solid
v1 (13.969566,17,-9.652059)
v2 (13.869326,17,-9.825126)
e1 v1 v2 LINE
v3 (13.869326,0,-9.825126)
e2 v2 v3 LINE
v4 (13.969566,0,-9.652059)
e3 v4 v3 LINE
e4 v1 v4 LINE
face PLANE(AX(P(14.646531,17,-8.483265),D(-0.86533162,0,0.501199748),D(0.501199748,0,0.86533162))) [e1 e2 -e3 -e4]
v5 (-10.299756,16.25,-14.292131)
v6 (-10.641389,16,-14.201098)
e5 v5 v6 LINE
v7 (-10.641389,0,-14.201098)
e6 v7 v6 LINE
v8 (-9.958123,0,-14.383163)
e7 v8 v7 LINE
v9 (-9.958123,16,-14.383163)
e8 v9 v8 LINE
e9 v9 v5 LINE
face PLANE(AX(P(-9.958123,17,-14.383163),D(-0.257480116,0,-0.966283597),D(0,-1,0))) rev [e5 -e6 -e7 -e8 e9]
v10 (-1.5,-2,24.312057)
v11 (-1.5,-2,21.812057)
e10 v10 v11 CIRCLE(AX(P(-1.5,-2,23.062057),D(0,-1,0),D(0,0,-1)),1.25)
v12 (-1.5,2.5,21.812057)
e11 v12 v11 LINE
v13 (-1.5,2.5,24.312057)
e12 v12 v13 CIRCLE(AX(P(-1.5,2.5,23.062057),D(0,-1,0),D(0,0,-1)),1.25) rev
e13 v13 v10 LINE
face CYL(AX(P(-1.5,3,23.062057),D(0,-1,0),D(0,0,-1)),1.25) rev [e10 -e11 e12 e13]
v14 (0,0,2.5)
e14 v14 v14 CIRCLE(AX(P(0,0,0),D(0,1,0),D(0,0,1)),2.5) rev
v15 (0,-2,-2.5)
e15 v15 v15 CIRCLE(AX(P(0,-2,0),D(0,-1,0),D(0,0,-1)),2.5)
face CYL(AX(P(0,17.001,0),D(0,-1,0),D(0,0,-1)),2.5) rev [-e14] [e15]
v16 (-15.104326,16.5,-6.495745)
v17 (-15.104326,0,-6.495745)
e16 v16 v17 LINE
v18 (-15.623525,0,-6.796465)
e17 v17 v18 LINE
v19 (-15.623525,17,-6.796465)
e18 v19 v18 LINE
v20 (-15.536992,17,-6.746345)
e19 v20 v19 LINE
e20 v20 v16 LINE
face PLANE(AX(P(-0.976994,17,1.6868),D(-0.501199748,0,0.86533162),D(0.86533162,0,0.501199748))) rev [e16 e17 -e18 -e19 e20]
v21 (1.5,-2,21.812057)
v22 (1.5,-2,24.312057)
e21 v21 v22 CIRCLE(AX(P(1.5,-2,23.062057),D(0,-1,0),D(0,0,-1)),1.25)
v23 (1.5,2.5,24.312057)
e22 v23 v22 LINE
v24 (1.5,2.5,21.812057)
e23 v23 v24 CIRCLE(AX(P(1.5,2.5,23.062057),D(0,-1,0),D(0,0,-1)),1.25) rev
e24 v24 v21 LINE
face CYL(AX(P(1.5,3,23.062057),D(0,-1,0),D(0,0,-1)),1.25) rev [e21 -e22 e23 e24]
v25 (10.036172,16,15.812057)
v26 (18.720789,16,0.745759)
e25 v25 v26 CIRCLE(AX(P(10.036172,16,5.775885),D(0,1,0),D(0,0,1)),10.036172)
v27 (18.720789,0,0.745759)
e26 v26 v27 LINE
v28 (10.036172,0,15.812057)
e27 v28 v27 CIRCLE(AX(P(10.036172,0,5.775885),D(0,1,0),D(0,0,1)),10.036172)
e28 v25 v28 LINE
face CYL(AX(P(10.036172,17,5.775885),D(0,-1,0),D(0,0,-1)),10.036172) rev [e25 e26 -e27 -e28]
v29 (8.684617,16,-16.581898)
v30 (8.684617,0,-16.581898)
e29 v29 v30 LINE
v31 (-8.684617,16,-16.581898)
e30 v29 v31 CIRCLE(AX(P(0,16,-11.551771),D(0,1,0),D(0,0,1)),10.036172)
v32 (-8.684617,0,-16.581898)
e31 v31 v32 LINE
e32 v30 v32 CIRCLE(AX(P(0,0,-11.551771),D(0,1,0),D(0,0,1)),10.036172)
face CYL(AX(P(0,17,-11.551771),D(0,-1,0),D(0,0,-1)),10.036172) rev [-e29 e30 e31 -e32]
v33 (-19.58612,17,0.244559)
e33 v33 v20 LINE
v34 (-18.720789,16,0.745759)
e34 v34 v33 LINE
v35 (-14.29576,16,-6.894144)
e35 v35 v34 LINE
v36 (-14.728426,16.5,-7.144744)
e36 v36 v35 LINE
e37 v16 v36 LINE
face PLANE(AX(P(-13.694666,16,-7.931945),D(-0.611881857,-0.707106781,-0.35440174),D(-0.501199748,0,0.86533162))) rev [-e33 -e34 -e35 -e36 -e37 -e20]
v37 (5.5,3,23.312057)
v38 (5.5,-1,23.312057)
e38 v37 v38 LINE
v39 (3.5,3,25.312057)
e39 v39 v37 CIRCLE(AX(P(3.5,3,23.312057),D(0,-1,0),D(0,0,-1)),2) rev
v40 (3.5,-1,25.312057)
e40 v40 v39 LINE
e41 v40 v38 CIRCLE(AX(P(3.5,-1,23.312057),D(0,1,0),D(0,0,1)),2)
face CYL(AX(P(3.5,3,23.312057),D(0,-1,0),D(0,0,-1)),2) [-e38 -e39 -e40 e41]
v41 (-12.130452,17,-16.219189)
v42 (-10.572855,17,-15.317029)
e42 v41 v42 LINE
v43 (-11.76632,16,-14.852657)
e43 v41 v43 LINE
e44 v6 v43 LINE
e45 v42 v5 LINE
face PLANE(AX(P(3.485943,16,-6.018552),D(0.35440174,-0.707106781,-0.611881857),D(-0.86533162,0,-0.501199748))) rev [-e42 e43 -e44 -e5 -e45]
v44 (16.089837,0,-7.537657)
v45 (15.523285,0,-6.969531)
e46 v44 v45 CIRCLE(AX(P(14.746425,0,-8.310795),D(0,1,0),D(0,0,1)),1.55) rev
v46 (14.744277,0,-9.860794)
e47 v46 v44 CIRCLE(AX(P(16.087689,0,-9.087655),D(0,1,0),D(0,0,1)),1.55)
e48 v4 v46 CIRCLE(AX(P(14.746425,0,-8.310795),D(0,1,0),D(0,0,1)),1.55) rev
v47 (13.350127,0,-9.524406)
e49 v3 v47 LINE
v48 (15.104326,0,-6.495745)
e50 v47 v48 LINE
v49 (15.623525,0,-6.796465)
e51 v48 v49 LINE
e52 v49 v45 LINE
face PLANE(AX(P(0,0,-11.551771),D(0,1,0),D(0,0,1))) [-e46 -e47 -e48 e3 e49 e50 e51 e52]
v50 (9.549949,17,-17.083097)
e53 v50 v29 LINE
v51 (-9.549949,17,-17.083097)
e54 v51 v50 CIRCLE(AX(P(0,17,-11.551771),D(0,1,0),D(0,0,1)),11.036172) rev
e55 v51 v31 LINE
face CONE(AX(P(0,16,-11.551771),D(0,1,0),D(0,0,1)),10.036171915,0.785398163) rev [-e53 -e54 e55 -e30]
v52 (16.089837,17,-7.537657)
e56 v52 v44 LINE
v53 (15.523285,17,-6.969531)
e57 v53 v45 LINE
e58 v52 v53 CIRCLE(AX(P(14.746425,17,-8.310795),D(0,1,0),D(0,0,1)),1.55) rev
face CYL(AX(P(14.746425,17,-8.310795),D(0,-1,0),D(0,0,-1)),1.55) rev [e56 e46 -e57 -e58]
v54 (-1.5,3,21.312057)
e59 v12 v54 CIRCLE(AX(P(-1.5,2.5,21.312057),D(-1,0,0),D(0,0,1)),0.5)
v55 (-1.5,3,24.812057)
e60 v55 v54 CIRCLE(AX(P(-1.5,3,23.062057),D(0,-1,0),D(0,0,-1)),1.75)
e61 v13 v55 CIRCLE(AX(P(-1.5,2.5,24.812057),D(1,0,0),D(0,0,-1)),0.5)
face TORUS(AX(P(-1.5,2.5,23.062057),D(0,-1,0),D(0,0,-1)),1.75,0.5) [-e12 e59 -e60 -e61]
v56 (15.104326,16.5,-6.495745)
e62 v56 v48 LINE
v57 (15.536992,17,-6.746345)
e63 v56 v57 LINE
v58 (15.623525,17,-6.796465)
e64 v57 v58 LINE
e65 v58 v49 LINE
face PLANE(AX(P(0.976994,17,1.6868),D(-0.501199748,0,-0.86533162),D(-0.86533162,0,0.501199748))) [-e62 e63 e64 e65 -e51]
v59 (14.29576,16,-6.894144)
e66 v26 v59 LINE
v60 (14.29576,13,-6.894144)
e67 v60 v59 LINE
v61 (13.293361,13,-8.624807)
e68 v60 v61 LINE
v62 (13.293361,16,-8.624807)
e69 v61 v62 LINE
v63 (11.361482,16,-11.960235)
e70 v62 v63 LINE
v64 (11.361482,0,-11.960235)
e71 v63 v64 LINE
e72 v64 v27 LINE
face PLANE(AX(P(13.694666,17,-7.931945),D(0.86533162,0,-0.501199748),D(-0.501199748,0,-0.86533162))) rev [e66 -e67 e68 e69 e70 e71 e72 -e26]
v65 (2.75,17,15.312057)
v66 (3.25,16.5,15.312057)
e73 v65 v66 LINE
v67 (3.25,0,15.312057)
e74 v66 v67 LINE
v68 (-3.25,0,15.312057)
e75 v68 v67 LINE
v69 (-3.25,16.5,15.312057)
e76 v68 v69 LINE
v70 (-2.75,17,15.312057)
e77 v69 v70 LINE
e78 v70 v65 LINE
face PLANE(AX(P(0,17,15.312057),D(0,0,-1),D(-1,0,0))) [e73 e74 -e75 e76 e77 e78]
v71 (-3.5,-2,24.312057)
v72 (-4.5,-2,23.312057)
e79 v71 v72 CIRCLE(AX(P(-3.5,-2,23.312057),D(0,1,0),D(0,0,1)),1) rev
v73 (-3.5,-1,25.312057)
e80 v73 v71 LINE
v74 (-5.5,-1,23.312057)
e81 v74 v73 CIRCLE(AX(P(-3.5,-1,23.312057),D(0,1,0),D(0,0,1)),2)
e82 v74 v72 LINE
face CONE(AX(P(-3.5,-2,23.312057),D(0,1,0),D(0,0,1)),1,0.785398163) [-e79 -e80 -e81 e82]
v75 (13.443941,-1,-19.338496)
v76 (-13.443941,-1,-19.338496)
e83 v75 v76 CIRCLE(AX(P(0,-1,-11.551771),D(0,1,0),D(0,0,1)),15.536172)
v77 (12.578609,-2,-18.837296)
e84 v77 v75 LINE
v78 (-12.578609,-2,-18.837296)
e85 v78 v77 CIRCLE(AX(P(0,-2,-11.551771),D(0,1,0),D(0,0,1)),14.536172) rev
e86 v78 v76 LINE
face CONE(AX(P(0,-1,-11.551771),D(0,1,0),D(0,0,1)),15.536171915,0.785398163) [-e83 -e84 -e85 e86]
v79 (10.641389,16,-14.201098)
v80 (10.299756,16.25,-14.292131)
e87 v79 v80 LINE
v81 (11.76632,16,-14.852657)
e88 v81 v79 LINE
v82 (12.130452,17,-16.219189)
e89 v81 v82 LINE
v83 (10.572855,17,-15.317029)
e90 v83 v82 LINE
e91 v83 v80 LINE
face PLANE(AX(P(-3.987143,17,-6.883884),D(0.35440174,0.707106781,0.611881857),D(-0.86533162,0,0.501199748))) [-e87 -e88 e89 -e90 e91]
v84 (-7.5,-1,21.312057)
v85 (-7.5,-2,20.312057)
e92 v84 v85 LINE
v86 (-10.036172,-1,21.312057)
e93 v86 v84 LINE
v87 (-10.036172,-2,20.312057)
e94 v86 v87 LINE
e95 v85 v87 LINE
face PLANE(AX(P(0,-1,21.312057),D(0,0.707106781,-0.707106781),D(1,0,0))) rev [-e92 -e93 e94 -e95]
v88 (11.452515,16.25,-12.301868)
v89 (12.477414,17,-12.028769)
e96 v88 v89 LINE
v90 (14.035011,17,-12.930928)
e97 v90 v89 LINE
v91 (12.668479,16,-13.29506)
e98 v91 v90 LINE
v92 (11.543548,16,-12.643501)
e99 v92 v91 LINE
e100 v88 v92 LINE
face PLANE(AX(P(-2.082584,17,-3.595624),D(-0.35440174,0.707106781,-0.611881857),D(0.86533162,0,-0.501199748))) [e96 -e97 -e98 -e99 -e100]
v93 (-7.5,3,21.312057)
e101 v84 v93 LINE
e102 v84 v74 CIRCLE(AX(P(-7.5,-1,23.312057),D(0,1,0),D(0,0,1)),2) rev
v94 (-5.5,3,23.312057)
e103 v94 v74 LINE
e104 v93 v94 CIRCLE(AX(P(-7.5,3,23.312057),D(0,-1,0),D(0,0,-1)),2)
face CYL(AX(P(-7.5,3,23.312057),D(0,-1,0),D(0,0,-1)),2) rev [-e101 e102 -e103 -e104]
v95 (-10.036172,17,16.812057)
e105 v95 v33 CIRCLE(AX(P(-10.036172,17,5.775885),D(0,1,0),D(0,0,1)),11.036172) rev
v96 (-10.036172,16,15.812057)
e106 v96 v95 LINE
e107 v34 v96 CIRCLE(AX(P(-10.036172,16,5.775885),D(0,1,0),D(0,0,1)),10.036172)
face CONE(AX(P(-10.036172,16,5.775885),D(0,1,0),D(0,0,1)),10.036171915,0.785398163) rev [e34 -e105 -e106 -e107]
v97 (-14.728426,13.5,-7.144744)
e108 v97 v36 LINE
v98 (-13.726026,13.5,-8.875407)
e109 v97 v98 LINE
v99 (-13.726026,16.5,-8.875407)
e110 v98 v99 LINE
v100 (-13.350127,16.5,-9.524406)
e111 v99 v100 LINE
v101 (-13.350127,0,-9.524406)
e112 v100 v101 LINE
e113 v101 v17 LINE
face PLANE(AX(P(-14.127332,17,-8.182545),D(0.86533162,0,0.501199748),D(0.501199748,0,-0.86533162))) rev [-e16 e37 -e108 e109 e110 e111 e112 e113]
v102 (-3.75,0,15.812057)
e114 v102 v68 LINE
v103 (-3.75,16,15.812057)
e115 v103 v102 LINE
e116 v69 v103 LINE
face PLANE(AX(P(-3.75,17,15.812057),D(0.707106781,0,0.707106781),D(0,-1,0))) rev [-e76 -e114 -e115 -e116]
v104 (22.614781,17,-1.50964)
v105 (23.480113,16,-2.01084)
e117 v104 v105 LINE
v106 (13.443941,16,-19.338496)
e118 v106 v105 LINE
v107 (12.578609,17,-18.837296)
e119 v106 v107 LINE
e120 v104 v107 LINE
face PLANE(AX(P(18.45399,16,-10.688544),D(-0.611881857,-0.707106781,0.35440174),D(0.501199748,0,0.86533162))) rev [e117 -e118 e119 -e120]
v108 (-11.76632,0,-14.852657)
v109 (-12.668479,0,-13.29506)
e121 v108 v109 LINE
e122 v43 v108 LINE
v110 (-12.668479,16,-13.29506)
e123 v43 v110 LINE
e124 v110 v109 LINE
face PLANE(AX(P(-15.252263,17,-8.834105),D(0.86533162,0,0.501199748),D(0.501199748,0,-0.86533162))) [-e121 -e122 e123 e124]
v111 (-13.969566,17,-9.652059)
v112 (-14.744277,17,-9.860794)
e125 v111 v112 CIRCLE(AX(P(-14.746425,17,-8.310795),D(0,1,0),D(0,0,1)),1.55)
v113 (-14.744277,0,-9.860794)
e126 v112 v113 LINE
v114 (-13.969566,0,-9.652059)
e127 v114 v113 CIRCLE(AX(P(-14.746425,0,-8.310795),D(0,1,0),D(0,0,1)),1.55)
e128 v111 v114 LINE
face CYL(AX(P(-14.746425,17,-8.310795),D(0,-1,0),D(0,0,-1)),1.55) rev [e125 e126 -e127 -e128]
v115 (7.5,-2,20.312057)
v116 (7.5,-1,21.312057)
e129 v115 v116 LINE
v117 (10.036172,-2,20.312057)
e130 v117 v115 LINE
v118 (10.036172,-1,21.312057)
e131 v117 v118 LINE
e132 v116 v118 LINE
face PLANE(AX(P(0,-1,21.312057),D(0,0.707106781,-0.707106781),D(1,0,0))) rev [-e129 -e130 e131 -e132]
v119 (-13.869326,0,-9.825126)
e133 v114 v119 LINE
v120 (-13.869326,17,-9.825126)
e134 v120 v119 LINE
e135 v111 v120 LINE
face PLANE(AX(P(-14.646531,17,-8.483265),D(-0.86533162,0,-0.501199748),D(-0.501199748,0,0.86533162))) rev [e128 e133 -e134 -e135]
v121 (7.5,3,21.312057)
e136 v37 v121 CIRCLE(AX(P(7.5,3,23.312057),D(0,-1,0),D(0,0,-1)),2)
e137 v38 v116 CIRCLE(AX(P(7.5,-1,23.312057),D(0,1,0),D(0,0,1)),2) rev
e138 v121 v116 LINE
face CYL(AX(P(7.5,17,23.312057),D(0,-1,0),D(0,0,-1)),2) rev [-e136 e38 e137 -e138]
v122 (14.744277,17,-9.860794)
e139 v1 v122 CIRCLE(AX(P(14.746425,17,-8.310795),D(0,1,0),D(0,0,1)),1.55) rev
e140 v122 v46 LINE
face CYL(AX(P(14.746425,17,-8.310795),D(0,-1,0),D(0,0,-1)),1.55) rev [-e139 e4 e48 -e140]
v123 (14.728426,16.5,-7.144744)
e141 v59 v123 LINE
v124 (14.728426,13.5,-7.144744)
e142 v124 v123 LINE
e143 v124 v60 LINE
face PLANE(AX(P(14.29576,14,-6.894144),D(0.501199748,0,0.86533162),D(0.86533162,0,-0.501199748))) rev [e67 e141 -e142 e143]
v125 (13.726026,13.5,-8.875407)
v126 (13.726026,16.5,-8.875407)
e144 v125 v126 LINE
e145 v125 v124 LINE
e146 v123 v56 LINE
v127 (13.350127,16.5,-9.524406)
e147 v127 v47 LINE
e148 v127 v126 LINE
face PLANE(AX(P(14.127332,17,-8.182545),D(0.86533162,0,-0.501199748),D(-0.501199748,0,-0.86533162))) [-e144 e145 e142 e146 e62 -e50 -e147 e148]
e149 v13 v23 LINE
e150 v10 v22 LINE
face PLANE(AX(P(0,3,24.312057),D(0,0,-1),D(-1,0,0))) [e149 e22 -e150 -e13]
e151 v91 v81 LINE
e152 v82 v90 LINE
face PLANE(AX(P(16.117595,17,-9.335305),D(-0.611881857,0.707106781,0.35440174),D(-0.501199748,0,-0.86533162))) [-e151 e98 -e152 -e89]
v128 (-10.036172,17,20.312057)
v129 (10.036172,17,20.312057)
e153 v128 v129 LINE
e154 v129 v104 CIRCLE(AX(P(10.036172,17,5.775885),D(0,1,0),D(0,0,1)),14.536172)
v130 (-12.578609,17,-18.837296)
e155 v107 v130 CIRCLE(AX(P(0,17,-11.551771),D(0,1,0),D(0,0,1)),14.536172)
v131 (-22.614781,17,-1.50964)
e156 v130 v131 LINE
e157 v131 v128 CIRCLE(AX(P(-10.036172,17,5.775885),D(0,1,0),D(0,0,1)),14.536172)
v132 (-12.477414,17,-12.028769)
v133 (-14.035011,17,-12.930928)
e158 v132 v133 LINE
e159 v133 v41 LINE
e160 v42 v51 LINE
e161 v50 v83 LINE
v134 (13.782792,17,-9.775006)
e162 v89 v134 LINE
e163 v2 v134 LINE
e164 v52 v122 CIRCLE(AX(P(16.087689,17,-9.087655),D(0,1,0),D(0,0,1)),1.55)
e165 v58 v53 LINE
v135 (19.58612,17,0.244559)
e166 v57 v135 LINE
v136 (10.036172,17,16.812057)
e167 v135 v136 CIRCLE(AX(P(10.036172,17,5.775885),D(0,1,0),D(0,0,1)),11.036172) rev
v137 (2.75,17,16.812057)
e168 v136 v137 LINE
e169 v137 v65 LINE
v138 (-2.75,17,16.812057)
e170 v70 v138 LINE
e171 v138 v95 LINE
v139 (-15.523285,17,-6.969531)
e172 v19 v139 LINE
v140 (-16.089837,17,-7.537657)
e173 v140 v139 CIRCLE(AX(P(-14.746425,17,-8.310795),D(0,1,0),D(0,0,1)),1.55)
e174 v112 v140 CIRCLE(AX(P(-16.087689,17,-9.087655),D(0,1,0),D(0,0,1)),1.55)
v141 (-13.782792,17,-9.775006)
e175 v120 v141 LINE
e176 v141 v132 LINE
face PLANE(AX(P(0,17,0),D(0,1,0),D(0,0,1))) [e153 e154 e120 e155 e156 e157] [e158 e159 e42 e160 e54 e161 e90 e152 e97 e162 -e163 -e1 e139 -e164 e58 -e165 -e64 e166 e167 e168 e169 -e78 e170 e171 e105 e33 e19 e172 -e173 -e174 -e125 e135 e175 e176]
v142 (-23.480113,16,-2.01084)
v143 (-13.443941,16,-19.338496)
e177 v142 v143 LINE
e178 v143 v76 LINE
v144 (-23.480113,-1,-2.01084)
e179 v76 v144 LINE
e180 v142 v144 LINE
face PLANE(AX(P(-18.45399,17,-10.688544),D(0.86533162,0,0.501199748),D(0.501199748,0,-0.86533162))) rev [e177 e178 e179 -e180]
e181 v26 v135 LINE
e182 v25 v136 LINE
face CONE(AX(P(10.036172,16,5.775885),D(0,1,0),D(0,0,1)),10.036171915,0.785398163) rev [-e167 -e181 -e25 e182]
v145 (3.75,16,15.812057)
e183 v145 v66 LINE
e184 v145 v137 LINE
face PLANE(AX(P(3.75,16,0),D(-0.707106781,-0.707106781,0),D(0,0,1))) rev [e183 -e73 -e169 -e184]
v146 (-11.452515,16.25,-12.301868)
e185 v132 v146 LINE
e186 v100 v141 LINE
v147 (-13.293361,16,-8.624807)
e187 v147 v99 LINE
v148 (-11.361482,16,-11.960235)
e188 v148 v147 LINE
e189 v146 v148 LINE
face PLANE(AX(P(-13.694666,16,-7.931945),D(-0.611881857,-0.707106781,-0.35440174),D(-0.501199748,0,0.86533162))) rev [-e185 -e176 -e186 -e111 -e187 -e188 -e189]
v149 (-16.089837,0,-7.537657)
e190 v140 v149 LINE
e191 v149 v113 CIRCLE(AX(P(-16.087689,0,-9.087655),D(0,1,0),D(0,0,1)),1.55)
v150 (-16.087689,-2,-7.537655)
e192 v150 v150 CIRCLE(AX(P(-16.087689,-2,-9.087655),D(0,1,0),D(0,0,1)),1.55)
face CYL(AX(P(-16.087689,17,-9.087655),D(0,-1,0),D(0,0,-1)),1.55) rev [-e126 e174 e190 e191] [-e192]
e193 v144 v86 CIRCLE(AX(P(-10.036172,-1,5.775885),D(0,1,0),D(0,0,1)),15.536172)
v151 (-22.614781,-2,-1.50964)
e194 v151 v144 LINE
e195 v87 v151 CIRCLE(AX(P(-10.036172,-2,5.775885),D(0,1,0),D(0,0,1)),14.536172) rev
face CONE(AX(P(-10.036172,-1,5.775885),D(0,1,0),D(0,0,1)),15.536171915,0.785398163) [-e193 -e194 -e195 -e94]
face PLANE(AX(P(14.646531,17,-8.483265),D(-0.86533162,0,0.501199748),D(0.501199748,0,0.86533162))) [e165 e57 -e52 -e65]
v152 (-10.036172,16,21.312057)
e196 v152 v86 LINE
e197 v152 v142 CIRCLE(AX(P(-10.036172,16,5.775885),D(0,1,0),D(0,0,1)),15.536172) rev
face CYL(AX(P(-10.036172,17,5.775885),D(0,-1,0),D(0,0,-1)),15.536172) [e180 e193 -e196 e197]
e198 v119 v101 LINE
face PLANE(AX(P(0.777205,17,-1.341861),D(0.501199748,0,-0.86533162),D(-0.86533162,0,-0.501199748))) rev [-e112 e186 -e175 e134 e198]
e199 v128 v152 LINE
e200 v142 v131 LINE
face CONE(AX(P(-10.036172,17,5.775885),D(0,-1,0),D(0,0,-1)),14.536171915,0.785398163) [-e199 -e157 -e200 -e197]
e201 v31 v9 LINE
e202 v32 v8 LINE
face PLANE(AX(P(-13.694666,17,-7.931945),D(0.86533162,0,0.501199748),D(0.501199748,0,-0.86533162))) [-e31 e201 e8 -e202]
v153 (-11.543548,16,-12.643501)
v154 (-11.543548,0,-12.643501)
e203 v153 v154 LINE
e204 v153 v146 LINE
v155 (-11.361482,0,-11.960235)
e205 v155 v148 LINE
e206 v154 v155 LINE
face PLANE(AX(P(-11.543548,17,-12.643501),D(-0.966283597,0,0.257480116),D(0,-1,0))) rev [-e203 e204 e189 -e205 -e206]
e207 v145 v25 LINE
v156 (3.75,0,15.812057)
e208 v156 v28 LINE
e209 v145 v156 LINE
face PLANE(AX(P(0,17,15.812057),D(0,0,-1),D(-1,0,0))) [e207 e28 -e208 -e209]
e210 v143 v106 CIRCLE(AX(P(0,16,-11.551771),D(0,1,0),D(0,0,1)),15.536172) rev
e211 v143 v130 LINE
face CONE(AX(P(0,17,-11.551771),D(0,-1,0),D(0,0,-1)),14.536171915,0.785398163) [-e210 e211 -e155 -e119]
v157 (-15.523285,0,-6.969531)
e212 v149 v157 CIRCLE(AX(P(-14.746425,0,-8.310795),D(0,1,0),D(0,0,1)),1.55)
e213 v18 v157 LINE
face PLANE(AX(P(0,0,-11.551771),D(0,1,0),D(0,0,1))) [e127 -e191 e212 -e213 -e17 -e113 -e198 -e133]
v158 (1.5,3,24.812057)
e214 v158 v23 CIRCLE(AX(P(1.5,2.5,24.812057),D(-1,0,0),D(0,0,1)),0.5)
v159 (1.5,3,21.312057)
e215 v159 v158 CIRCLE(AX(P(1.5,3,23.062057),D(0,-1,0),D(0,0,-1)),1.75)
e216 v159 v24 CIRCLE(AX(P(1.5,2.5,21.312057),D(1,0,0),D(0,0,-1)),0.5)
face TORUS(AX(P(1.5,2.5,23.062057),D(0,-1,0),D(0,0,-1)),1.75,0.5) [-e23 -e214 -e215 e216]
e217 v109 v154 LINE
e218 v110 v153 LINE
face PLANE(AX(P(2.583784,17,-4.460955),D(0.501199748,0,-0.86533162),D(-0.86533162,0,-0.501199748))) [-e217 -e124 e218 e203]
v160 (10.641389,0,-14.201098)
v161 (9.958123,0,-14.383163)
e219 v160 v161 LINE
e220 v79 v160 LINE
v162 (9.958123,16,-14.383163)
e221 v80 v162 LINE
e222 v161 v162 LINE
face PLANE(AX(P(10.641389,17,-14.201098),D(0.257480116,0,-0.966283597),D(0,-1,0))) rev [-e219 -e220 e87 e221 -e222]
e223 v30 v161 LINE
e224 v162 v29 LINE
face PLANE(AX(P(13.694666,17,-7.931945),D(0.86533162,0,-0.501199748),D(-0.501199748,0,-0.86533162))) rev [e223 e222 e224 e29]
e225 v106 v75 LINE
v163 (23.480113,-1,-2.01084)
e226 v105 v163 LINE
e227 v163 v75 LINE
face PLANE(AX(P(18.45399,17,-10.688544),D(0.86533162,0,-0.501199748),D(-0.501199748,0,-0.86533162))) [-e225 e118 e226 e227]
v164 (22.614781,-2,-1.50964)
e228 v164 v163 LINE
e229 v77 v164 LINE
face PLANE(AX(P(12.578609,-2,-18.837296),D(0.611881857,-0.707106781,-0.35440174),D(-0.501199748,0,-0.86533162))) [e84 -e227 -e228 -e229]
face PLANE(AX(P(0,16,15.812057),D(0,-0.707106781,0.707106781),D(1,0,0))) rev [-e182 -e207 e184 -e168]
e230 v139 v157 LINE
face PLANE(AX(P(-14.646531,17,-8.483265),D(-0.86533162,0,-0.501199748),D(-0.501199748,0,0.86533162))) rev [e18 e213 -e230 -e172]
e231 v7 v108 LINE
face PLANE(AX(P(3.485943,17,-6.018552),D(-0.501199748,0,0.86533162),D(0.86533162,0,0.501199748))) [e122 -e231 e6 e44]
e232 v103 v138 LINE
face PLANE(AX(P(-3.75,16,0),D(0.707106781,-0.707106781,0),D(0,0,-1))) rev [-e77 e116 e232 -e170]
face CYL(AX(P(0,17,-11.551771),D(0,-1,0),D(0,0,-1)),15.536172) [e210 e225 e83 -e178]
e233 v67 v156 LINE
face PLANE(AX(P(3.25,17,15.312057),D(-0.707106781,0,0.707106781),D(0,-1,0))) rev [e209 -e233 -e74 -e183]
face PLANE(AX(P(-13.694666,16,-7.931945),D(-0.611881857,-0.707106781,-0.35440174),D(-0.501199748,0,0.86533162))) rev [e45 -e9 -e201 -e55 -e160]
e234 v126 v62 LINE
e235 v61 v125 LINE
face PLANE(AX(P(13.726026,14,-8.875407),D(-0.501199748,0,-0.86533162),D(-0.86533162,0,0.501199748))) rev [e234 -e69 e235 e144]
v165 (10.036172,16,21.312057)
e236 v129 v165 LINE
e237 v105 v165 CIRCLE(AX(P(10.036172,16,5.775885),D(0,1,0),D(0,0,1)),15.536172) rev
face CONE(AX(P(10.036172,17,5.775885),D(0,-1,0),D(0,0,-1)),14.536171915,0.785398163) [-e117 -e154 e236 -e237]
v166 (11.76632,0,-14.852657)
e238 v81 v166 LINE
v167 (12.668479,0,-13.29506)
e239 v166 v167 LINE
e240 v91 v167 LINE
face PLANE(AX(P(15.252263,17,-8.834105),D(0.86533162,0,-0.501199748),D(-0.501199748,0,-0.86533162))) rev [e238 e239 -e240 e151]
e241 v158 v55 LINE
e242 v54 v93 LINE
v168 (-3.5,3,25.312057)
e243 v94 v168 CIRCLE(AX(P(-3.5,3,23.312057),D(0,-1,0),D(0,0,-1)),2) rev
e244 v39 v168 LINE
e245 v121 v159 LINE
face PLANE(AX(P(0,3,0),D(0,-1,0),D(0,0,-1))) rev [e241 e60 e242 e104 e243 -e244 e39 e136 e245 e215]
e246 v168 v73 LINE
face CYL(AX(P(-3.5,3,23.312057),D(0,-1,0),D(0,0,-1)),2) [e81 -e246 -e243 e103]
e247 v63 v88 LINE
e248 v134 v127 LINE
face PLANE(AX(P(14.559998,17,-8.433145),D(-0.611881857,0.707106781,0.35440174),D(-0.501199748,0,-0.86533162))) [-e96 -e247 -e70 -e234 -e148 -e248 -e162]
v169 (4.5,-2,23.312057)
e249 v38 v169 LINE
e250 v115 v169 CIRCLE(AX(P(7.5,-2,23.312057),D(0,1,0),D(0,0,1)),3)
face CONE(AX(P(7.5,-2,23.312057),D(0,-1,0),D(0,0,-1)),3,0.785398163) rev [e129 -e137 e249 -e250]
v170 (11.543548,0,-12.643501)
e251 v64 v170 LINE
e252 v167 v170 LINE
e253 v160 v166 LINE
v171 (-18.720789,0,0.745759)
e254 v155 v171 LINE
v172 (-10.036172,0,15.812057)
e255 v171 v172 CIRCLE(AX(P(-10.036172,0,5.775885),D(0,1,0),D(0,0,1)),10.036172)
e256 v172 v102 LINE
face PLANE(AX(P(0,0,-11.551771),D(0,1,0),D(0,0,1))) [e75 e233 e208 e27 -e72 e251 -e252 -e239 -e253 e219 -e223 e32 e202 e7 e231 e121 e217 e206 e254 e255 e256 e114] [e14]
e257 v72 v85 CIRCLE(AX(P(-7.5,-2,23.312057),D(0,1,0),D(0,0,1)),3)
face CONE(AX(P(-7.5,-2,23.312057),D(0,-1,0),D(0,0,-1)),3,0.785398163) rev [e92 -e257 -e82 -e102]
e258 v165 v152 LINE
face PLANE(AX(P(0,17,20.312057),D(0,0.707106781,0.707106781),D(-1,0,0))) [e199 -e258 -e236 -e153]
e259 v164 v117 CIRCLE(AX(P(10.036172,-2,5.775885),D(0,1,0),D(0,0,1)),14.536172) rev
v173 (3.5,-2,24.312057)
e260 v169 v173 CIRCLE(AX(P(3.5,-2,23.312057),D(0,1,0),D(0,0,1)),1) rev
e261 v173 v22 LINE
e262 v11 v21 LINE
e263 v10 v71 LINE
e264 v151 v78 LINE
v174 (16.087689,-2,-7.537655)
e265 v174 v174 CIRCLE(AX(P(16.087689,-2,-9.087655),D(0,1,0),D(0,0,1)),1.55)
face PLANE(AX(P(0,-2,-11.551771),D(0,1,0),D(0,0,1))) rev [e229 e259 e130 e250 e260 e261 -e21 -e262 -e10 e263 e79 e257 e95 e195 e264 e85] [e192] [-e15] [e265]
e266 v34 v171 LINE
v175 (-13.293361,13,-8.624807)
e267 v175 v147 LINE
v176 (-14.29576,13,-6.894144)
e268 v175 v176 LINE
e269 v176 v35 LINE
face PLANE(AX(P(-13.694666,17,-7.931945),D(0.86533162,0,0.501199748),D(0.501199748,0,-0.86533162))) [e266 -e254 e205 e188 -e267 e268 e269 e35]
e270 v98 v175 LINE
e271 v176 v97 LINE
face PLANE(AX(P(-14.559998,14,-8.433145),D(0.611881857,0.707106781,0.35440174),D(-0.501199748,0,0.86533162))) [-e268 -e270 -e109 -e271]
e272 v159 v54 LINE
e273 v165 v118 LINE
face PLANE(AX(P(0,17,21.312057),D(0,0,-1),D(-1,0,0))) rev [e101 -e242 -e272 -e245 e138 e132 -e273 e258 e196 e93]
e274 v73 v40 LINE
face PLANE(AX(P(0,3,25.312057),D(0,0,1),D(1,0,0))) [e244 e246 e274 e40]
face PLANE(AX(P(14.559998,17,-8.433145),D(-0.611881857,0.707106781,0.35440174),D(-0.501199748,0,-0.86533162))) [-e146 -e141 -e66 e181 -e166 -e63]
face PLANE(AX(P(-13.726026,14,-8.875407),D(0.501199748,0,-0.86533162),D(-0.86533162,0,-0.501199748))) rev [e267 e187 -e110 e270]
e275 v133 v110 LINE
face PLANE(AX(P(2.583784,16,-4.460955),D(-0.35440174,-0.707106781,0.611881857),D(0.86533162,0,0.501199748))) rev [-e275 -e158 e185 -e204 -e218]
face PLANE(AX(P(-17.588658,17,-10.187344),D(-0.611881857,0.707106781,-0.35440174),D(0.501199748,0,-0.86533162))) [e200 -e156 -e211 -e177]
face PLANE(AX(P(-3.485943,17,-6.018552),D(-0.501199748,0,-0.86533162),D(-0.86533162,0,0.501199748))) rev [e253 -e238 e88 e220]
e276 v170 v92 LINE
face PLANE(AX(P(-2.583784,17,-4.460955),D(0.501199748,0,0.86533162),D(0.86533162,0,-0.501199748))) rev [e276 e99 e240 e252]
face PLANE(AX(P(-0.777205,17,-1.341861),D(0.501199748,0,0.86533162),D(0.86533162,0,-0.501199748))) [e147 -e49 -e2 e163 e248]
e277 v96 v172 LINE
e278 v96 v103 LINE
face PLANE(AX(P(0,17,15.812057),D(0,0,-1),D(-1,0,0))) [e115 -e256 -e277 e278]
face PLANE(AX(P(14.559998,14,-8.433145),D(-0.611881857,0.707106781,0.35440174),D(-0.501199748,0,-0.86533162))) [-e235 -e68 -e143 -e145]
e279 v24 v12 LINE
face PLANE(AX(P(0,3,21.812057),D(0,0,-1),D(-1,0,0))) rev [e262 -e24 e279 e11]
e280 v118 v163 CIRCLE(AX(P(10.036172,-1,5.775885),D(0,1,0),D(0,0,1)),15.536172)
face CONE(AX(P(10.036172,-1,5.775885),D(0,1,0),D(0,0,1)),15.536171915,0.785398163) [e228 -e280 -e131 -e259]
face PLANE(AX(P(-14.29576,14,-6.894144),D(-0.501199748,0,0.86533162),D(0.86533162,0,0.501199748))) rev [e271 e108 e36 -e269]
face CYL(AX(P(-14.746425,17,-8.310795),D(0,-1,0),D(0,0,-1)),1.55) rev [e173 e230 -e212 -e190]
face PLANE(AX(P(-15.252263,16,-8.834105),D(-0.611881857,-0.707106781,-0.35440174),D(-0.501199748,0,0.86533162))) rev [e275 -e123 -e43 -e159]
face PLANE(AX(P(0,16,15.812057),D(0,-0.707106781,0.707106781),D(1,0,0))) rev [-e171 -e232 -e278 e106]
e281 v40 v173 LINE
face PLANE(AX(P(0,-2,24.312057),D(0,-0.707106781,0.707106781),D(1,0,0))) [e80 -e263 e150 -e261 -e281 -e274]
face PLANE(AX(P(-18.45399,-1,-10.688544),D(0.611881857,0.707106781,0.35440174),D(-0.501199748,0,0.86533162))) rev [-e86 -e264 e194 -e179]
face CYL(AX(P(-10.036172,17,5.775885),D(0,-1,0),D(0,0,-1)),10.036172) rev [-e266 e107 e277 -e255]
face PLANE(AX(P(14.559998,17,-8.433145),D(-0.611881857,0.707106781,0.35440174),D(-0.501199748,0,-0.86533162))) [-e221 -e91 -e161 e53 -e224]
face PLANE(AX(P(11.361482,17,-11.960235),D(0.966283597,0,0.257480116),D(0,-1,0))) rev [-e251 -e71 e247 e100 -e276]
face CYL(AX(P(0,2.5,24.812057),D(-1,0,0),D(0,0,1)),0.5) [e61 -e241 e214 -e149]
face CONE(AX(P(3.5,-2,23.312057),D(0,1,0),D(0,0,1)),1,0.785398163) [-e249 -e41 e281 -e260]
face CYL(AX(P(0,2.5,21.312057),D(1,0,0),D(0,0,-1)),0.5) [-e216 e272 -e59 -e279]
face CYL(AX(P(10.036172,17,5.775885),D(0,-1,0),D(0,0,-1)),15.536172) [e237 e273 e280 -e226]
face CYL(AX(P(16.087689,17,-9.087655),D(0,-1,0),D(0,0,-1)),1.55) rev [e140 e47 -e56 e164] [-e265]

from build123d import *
from build123d.topology import SkipClean

# Parameters (mm, degrees)
BOSS_EXTRUDE1_DEPTH = 17
CHAMFER1_SIZE       = 0.5
BOSS_EXTRUDE2_START = -2
SKETCH1_4_R         = 1.55
BOSS_EXTRUDE2_DEPTH = 2
CUT_EXTRUDE2_REACH  = 43.817
SKETCH2_R           = 2.5
SKETCH2_2_W         = 11
SKETCH2_2_H         = 4
BOSS_EXTRUDE3_DEPTH = 5
FILLET1_R           = 2
FILLET2_R           = 0.5
CHAMFER4_SIZE       = 1
CUT_EXTRUDE3_DEPTH  = 3
CHAMFER5_SIZE       = 1
CHAMFER6_SIZE       = 0.5


# Some blends are built 0.0001 mm under size
with BuildPart() as part:
    # Sketch1 → Boss-Extrude1 (new body)
    with BuildSketch(Plane(origin=(0, 0, 0), x_dir=(1, 0, 0), z_dir=(0, 1, 0))):
        with BuildLine():
            ThreePointArc((13.443940814, 19.338496226), (0, 27.087942695), (-13.443940814, 19.338496226))
            Line((-13.443940814, 19.338496226), (-23.480112729, 2.010840056))
            ThreePointArc((-23.480112729, 2.010840056), (-23.496271152, -13.534646006), (-10.036171915, -21.312057305))
            Line((-10.036171915, -21.312057305), (10.036171915, -21.312057305))
            ThreePointArc((10.036171915, -21.312057305), (23.496271152, -13.534646006), (23.480112729, 2.010840056))
            Line((23.480112729, 2.010840056), (13.443940814, 19.338496226))
        make_face()
        with BuildLine():
            Line((-3.75, -15.312057305), (-3.75, -15.812057305))
            Line((-3.75, -15.812057305), (-10.036171915, -15.812057305))
            ThreePointArc((-10.036171915, -15.812057305), (-18.731226957, -10.787947294), (-18.720788818, -0.745758557))
            Line((-18.720788818, -0.745758557), (-11.1108823, 12.392900759))
            Line((-11.1108823, 12.392900759), (-12.668479216, 13.295060305))
            Line((-12.668479216, 13.295060305), (-11.76631967, 14.852657222))
            Line((-11.76631967, 14.852657222), (-10.208722754, 13.950497676))
            Line((-10.208722754, 13.950497676), (-8.684616903, 16.581897613))
            ThreePointArc((-8.684616903, 16.581897613), (0, 21.587942695), (8.684616903, 16.581897613))
            Line((8.684616903, 16.581897613), (10.208722754, 13.950497676))
            Line((10.208722754, 13.950497676), (11.76631967, 14.852657222))
            Line((11.76631967, 14.852657222), (12.668479216, 13.295060305))
            Line((12.668479216, 13.295060305), (11.1108823, 12.392900759))
            Line((11.1108823, 12.392900759), (18.720788818, -0.745758557))
            ThreePointArc((18.720788818, -0.745758557), (18.731226957, -10.787947294), (10.036171915, -15.812057305))
            Line((10.036171915, -15.812057305), (3.75, -15.812057305))
            Line((3.75, -15.812057305), (3.75, -15.312057305))
            Line((3.75, -15.312057305), (-3.75, -15.312057305))
        make_face(mode=Mode.SUBTRACT)
        with BuildLine():
            Line((-13.869325554, 9.825125784), (-13.350126582, 9.524405935))
            Line((-13.350126582, 9.524405935), (-15.104325699, 6.495745265))
            Line((-15.104325699, 6.495745265), (-15.623524672, 6.796465113))
            Line((-15.623524672, 6.796465113), (-15.523284722, 6.969531437))
            ThreePointArc((-15.523284722, 6.969531437), (-15.843958543, 7.216299963), (-16.089837275, 7.537656546))
            ThreePointArc((-16.089837275, 7.537656546), (-17.428953135, 9.864514667), (-14.744276962, 9.86079396))
            ThreePointArc((-14.744276962, 9.86079396), (-14.343181024, 9.807423059), (-13.969565504, 9.65205946))
            Line((-13.969565504, 9.65205946), (-13.869325554, 9.825125784))
        make_face(mode=Mode.SUBTRACT)
        with BuildLine():
            Line((13.869325554, 9.825125784), (13.969565504, 9.65205946))
            ThreePointArc((13.969565504, 9.65205946), (14.343181024, 9.807423059), (14.744276962, 9.86079396))
            ThreePointArc((14.744276962, 9.86079396), (17.428953135, 9.864514667), (16.089837275, 7.537656546))
            ThreePointArc((16.089837275, 7.537656546), (15.843958543, 7.216299963), (15.523284722, 6.969531437))
            Line((15.523284722, 6.969531437), (15.623524672, 6.796465113))
            Line((15.623524672, 6.796465113), (15.104325699, 6.495745265))
            Line((15.104325699, 6.495745265), (13.350126582, 9.524405935))
            Line((13.350126582, 9.524405935), (13.869325554, 9.825125784))
        make_face(mode=Mode.SUBTRACT)
    extrude(amount=BOSS_EXTRUDE1_DEPTH)

    # Chamfer1
    chamfer1_edges = [part.edges().sort_by_distance(p)[0] for p in [
        (-10.208722754, 8.5, -13.950497676),
        (-11.1108823, 8.5, -12.392900759),
        (11.1108823, 8.5, -12.392900759),
        (10.208722754, 8.5, -13.950497676),
    ]]
    chamfer(chamfer1_edges, length=CHAMFER1_SIZE)

    # Sketch1<4> → Boss-Extrude2 (add)
    with SkipClean():  # the faces are left unmerged after this step: merging them gives an invalid solid
        with BuildSketch(Plane(origin=(0, 0, 0), x_dir=(1, 0, 0), z_dir=(0, 1, 0)).offset(BOSS_EXTRUDE2_START)):
            with BuildLine():
                ThreePointArc((13.443940814, 19.338496226), (0, 27.087942695), (-13.443940814, 19.338496226))
                Line((-13.443940814, 19.338496226), (-23.480112729, 2.010840056))
                ThreePointArc((-23.480112729, 2.010840056), (-23.496271152, -13.534646006), (-10.036171915, -21.312057305))
                Line((-10.036171915, -21.312057305), (10.036171915, -21.312057305))
                ThreePointArc((10.036171915, -21.312057305), (23.496271152, -13.534646006), (23.480112729, 2.010840056))
                Line((23.480112729, 2.010840056), (13.443940814, 19.338496226))
            make_face()
            with Locations(Location((-16.087689124, 9.087655058, 0), (0, 0, 29.920593528))):
                Circle(SKETCH1_4_R, mode=Mode.SUBTRACT)
            with Locations(Location((16.087689124, 9.087655058, 0), (0, 0, 150.079406472))):
                Circle(SKETCH1_4_R, mode=Mode.SUBTRACT)
        extrude(amount=BOSS_EXTRUDE2_DEPTH)

    # Sketch2 → Cut-Extrude2 (cut, up to next)
    with BuildSketch(Plane.XZ.offset(2), mode=Mode.PRIVATE) as cut_extrude2_sk1:
        with Locations(Location((0, 0, 0), (0, 0, 270))):
            Circle(SKETCH2_R)
    cut_extrude2_tool1 = extrude(cut_extrude2_sk1.sketch, amount=-CUT_EXTRUDE2_REACH, mode=Mode.PRIVATE) & part.part
    add(cut_extrude2_tool1.solids().sort_by_distance((0, -2, 0))[0], mode=Mode.SUBTRACT)

    # Sketch2<2> → Boss-Extrude3 (add)
    with SkipClean():  # the faces are left unmerged after this step: merging them gives an invalid solid
        with BuildSketch(Plane.XZ.offset(2)):
            with Locations((0, 23.312057305)):
                Rectangle(SKETCH2_2_W, SKETCH2_2_H)
            with BuildLine():
                ThreePointArc((-1.5, 21.812057305), (-2.75, 23.062057305), (-1.5, 24.312057305))
                Line((-1.5, 24.312057305), (1.5, 24.312057305))
                ThreePointArc((1.5, 24.312057305), (2.75, 23.062057305), (1.5, 21.812057305))
                Line((1.5, 21.812057305), (-1.5, 21.812057305))
            make_face(mode=Mode.SUBTRACT)
        extrude(amount=-BOSS_EXTRUDE3_DEPTH)

    # Fillet1
    fillet1_edges = [part.edges().sort_by_distance(p)[0] for p in [
        (5.5, 1.5, 21.312057305),
        (-5.5, 1.5, 21.312057305),
        (-5.5, -1, 21.312057305),
        (5.5, -1, 21.312057305),
    ]]
    fillet(fillet1_edges, radius=FILLET1_R)
    fillet1_2_edges = [part.edges().sort_by_distance(p)[0] for p in [
        (5.5, 0.5, 25.312057305),
        (-5.5, 0.5, 25.312057305),
    ]]
    fillet(fillet1_2_edges, radius=FILLET1_R - 0.0001)  # a hair under: the kernel refuses the full size

    # Fillet2
    fillet2_edges = [part.edges().sort_by_distance(p)[0] for p in [
        (0, 3, 24.312057305),
        (2.75, 3, 23.062057305),
        (-2.75, 3, 23.062057305),
        (0, 3, 21.812057305),
    ]]
    fillet(fillet2_edges, radius=FILLET2_R - 0.0001)  # a hair under: the kernel refuses the full size

    # Chamfer4
    chamfer4_edges = [part.edges().sort_by_distance(p)[0] for p in [
        (0, -2, -27.087942695),
        (23.496271152, -2, 13.534646006),
        (-8.768085957, -2, 21.312057305),
        (-23.496271152, -2, 13.534646006),
        (-18.462026771, -2, -10.674668141),
        (18.462026771, -2, -10.674668141),
        (0, 17, 21.312057305),
        (23.496271152, 17, 13.534646006),
        (18.462026771, 17, -10.674668141),
        (0, 17, -27.087942695),
        (-18.462026771, 17, -10.674668141),
        (-23.496271152, 17, 13.534646006),
        (8.768085958, -2, 21.312057305),
        (0, -2, 25.312057305),
        (-4.914242852, -2, 24.726300157),
        (4.914242852, -2, 24.726300157),
        (6.085786438, -2, 21.897843743),
        (-6.085786438, -2, 21.897843743),
    ]]
    chamfer(chamfer4_edges, length=CHAMFER4_SIZE - 0.0001)  # a hair under: the kernel refuses the full size

    # Sketch3 → Cut-Extrude3 (cut)
    with SkipClean():  # the faces are left unmerged after this step: merging them gives an invalid solid
        with BuildSketch(Plane(origin=(0, 17, 0), x_dir=(1, 0, 0), z_dir=(0, 1, 0))):
            Polygon((-13.726026393, 8.87540722), (-13.293360583, 8.624807346), (-14.295760079, 6.894144106), (-14.728425889, 7.14474398), align=None)
            Polygon((14.728425889, 7.14474398), (13.726026393, 8.87540722), (13.293360583, 8.624807346), (14.295760079, 6.894144106), align=None)
        extrude(amount=-CUT_EXTRUDE3_DEPTH, mode=Mode.SUBTRACT)

    # Chamfer5
    # the kernel refuses this chamfer: 1 mm, written as the material it takes off along each edge
    with BuildSketch(Plane(origin=(13.293360583, 14, -8.624807346), x_dir=(-0.023793051453924997, -0.9996219169112968, 0.013780926423705212), z_dir=(0.5011997478341295, 0, 0.8653316201150892))) as chamfer5_piece_1:
        Polygon((CHAMFER5_SIZE * 0.999621916911, CHAMFER5_SIZE * 0.0274958766106), (-CHAMFER5_SIZE * 0.0274958766106, CHAMFER5_SIZE * 0.999621916911), (0, 0), align=None)
    extrude(amount=2, mode=Mode.SUBTRACT)
    with BuildSketch(Plane(origin=(-13.293360583, 14, -8.624807346), x_dir=(0.023793051453929074, -0.9996219169112965, 0.013780926423707577), z_dir=(-0.5011997478341295, 0, 0.8653316201150892))) as chamfer5_piece_2:
        Polygon((CHAMFER5_SIZE * 0.999621916911, -CHAMFER5_SIZE * 0.0274958766106), (-CHAMFER5_SIZE * 0.0274958766106, -CHAMFER5_SIZE * 0.999621916911), (0, 0), align=None)
    extrude(amount=2, mode=Mode.SUBTRACT)
    with BuildSketch(Plane(origin=(8.416029957, 17, -12.912170684), x_dir=(0.013780926423704562, -0.9996219169112968, 0.023793051453923648), z_dir=(0.8653316201150872, 0, -0.501199747834133)), Plane(origin=(12.668479216, 17, -13.295060305), x_dir=(-0.013780926423704508, -0.9996219169112968, -0.02379305145392368), z_dir=(-0.8653316201150884, 0, 0.501199747834131)), Plane(origin=(-9.318189504, 17, -11.354573768), x_dir=(0.013780926423704508, -0.9996219169112968, -0.02379305145392368), z_dir=(-0.8653316201150884, 0, -0.501199747834131)), Plane(origin=(-11.76631967, 17, -14.852657222), x_dir=(-0.013780926423704518, -0.9996219169112968, 0.023793051453923672), z_dir=(0.8653316201150881, 0, 0.5011997478341315))) as chamfer5_piece_3:
        Polygon((CHAMFER5_SIZE * 0.999621916911, CHAMFER5_SIZE * 0.0274958766106), (-CHAMFER5_SIZE * 0.0274958766106, CHAMFER5_SIZE * 0.999621916911), (0, 0), align=None)
    extrude(amount=3.871682988, mode=Mode.SUBTRACT)
    with BuildSketch(Plane(origin=(11.76631967, 17, -14.852657222), x_dir=(-0.023793051453923655, -0.9996219169112968, 0.013780926423704546), z_dir=(0.5011997478341325, 0, 0.8653316201150876)), Plane(origin=(-12.668479216, 17, -13.295060305), x_dir=(0.02379305145392368, -0.9996219169112968, 0.013780926423704508), z_dir=(0.501199747834131, 0, -0.8653316201150884))) as chamfer5_piece_4:
        Polygon((CHAMFER5_SIZE * 0.999621916911, CHAMFER5_SIZE * 0.0274958766106), (-CHAMFER5_SIZE * 0.0274958766106, CHAMFER5_SIZE * 0.999621916911), (0, 0), align=None)
    extrude(amount=1.8, mode=Mode.SUBTRACT)
    with BuildSketch(Plane(origin=(10.072555309, 17, -14.185593556), x_dir=(-0.023793051453924238, -0.9996219169112968, 0.013780926423704794), z_dir=(0.50119974783413, 0, 0.8653316201150889)), Plane(origin=(-14.582287448, 17, -6.39944874), x_dir=(0.0237930514539237, -0.9996219169112968, 0.013780926423704468), z_dir=(0.5011997478341296, 0, -0.8653316201150891))) as chamfer5_piece_5:
        Polygon((CHAMFER5_SIZE * 0.999621916911, CHAMFER5_SIZE * 0.0274958766106), (-CHAMFER5_SIZE * 0.0274958766106, CHAMFER5_SIZE * 0.999621916911), (0, 0), align=None)
    extrude(amount=8.997873919, mode=Mode.SUBTRACT)
    with BuildSketch(Plane(origin=(13.006833213, 17, -9.119502712), x_dir=(-0.023793051453922947, -0.9996219169112968, 0.013780926423704046), z_dir=(0.50119974783413, 0, 0.8653316201150889)), Plane(origin=(-18.720788818, 17, 0.745758557), x_dir=(0.0237930514539225, -0.9996219169112968, 0.013780926423703772), z_dir=(0.5011997478341296, 0, -0.8653316201150891))) as chamfer5_piece_6:
        Polygon((CHAMFER5_SIZE * 0.999621916911, CHAMFER5_SIZE * 0.0274958766106), (-CHAMFER5_SIZE * 0.0274958766106, CHAMFER5_SIZE * 0.999621916911), (0, 0), align=None)
    extrude(amount=11.400555625, mode=Mode.SUBTRACT)
    with BuildSketch(Plane(origin=(10.036171915, 17, 5.77588539), x_dir=(0.8653316201150898, 0, -0.5011997478341286), z_dir=(-0.5011997478341286, 0, -0.8653316201150898))) as chamfer5_piece_7:
        Polygon((10.036171915, CHAMFER5_SIZE), (10.036171915 + CHAMFER5_SIZE, 0), (10.036171915, 0), align=None)
    revolve(axis=Axis((10.036171915, 17, 5.77588539), (0, -1, 0)), revolution_arc=120.079406472, mode=Mode.SUBTRACT)
    with BuildSketch(Plane(origin=(10.036171915, 17, 15.812057305), x_dir=(0, -0.9996219169112968, -0.027495876610585647), z_dir=(-1, 0, 0)), Plane(origin=(-3.75, 17, 15.812057305), x_dir=(0, -0.9996219169112968, -0.027495876610585647), z_dir=(-1, 0, 0))) as chamfer5_piece_8:
        Polygon((CHAMFER5_SIZE * 0.999621916911, CHAMFER5_SIZE * 0.0274958766106), (-CHAMFER5_SIZE * 0.0274958766106, CHAMFER5_SIZE * 0.999621916911), (0, 0), align=None)
    extrude(amount=6.286171915, mode=Mode.SUBTRACT)
    with BuildSketch(Plane(origin=(3.75, 17, 15.812057305), x_dir=(0.02749587661058651, -0.9996219169112968, 0), z_dir=(0, 0, -1)), Plane(origin=(-3.75, 17, 12.740374317), x_dir=(-0.02749587661058651, -0.9996219169112968, 0), z_dir=(0, 0, 1))) as chamfer5_piece_9:
        Polygon((CHAMFER5_SIZE * 0.999621916911, CHAMFER5_SIZE * 0.0274958766106), (-CHAMFER5_SIZE * 0.0274958766106, CHAMFER5_SIZE * 0.999621916911), (0, 0), align=None)
    extrude(amount=3.071682988, mode=Mode.SUBTRACT)
    with BuildSketch(Plane(origin=(-10.036171915, 17, 5.77588539), x_dir=(0, 0, 1), z_dir=(1, 0, 0))) as chamfer5_piece_10:
        Polygon((10.036171915, CHAMFER5_SIZE), (10.036171915 + CHAMFER5_SIZE, 0), (10.036171915, 0), align=None)
    revolve(axis=Axis((-10.036171915, 17, 5.77588539), (0, -1, 0)), revolution_arc=120.079406472, mode=Mode.SUBTRACT)
    with BuildSketch(Plane(origin=(8.684616903, 17, -16.581897613), x_dir=(-0.023793051453924442, -0.9996219169112968, 0.01378092642370491), z_dir=(0.5011997478341299, 0, 0.8653316201150889)), Plane(origin=(-11.247049745, 17, -12.157804879), x_dir=(0.023793051453922406, -0.9996219169112968, 0.013780926423703719), z_dir=(0.5011997478341296, 0, -0.8653316201150891))) as chamfer5_piece_11:
        Polygon((CHAMFER5_SIZE * 0.999621916911, CHAMFER5_SIZE * 0.0274958766106), (-CHAMFER5_SIZE * 0.0274958766106, CHAMFER5_SIZE * 0.999621916911), (0, 0), align=None)
    extrude(amount=5.112598027, mode=Mode.SUBTRACT)
    with BuildSketch(Plane(origin=(0, 17, -11.55177078), x_dir=(-0.8653316201150889, 0, -0.5011997478341299), z_dir=(-0.5011997478341299, 0, 0.8653316201150889))) as chamfer5_piece_12:
        Polygon((10.036171915, CHAMFER5_SIZE), (10.036171915 + CHAMFER5_SIZE, 0), (10.036171915, 0), align=None)
    revolve(axis=Axis((0, 17, -11.55177078), (0, -1, 0)), revolution_arc=119.841187056, mode=Mode.SUBTRACT)
    with BuildSketch(Plane(origin=(8.416029957, 17, -12.912170684), x_dir=(0.013780926423704562, -0.9996219169112968, 0.023793051453923648), z_dir=(0.8653316201150872, 0, -0.501199747834133))) as chamfer5_piece_13a_section:
        Polygon((CHAMFER5_SIZE * 0.999621916911, CHAMFER5_SIZE * 0.0274958766106), (-CHAMFER5_SIZE * 0.0274958766106, CHAMFER5_SIZE * 0.999621916911), (0, 0), align=None)
    chamfer5_piece_13a = extrude(amount=6.443365976, mode=Mode.PRIVATE)
    chamfer5_piece_13a = split(chamfer5_piece_13a, bisect_by=Plane(origin=(11.601027187, 16.670206373, -15.138038075), z_dir=(0.8653316201150876, 0, -0.5011997478341325)), keep=Keep.TOP, mode=Mode.PRIVATE)
    with BuildSketch(Plane(origin=(10.477392805, 17, -17.078015828), x_dir=(-0.023793051453924404, -0.9996219169112968, 0.01378092642370498), z_dir=(0.5011997478341325, 0, 0.8653316201150876))) as chamfer5_piece_13b_section:
        Polygon((CHAMFER5_SIZE * 0.999621916911, CHAMFER5_SIZE * 0.0274958766106), (-CHAMFER5_SIZE * 0.0274958766106, CHAMFER5_SIZE * 0.999621916911), (0, 0), align=None)
    chamfer5_piece_13b = extrude(amount=4.371682988, mode=Mode.PRIVATE)
    chamfer5_piece_13b = split(chamfer5_piece_13b, bisect_by=Plane(origin=(12.051700523, 16.670206373, -15.017949704), z_dir=(-0.501199747834133, 0, -0.8653316201150872)), keep=Keep.TOP, mode=Mode.PRIVATE)
    chamfer5_piece_13 = chamfer5_piece_13a & chamfer5_piece_13b
    add(chamfer5_piece_13, mode=Mode.SUBTRACT)
    with BuildSketch(Plane(origin=(11.76631967, 17, -14.852657222), x_dir=(-0.023793051453923655, -0.9996219169112968, 0.013780926423704546), z_dir=(0.5011997478341325, 0, 0.8653316201150876))) as chamfer5_piece_14a_section:
        Polygon((CHAMFER5_SIZE * 0.999621916911, CHAMFER5_SIZE * 0.0274958766106), (-CHAMFER5_SIZE * 0.0274958766106, CHAMFER5_SIZE * 0.999621916911), (0, 0), align=None)
    chamfer5_piece_14a = extrude(amount=4.371682988, mode=Mode.PRIVATE)
    chamfer5_piece_14a = split(chamfer5_piece_14a, bisect_by=Plane(origin=(12.953860069, 16.670206373, -13.460352788), z_dir=(0.501199747834131, 0, 0.8653316201150884)), keep=Keep.TOP, mode=Mode.PRIVATE)
    with BuildSketch(Plane(origin=(14.893837822, 17, -14.58398717), x_dir=(-0.013780926423704508, -0.9996219169112968, -0.02379305145392368), z_dir=(-0.8653316201150884, 0, 0.501199747834131))) as chamfer5_piece_14b_section:
        Polygon((CHAMFER5_SIZE * 0.999621916911, CHAMFER5_SIZE * 0.0274958766106), (-CHAMFER5_SIZE * 0.0274958766106, CHAMFER5_SIZE * 0.999621916911), (0, 0), align=None)
    chamfer5_piece_14b = extrude(amount=6.443365976, mode=Mode.PRIVATE)
    chamfer5_piece_14b = split(chamfer5_piece_14b, bisect_by=Plane(origin=(12.833771699, 16.670206373, -13.009679452), z_dir=(0.8653316201150876, 0, -0.5011997478341325)), keep=Keep.TOP, mode=Mode.PRIVATE)
    chamfer5_piece_14 = chamfer5_piece_14a & chamfer5_piece_14b
    add(chamfer5_piece_14, mode=Mode.SUBTRACT)
    with BuildSketch(Plane(origin=(3.75, 17, 18.383740293), x_dir=(0.02749587661058651, -0.9996219169112968, 0), z_dir=(0, 0, -1))) as chamfer5_piece_15a_section:
        Polygon((CHAMFER5_SIZE * 0.999621916911, CHAMFER5_SIZE * 0.0274958766106), (-CHAMFER5_SIZE * 0.0274958766106, CHAMFER5_SIZE * 0.999621916911), (0, 0), align=None)
    chamfer5_piece_15a = extrude(amount=5.643365976, mode=Mode.PRIVATE)
    chamfer5_piece_15a = split(chamfer5_piece_15a, bisect_by=Plane(origin=(3.420206373, 16.670206373, 15.812057305), z_dir=(0, 0, 1)), keep=Keep.TOP, mode=Mode.PRIVATE)
    with BuildSketch(Plane(origin=(10.036171915, 17, 15.812057305), x_dir=(0, -0.9996219169112968, -0.027495876610585647), z_dir=(-1, 0, 0))) as chamfer5_piece_15b_section:
        Polygon((CHAMFER5_SIZE * 0.999621916911, CHAMFER5_SIZE * 0.0274958766106), (-CHAMFER5_SIZE * 0.0274958766106, CHAMFER5_SIZE * 0.999621916911), (0, 0), align=None)
    chamfer5_piece_15b = extrude(amount=8.857854903, mode=Mode.PRIVATE)
    chamfer5_piece_15b = split(chamfer5_piece_15b, bisect_by=Plane(origin=(3.75, 16.670206373, 16.141850932), z_dir=(-1, 0, 0)), keep=Keep.TOP, mode=Mode.PRIVATE)
    chamfer5_piece_15 = chamfer5_piece_15a & chamfer5_piece_15b
    add(chamfer5_piece_15, mode=Mode.SUBTRACT)
    with BuildSketch(Plane(origin=(-1.178317012, 17, 15.812057305), x_dir=(0, -0.9996219169112968, -0.027495876610585647), z_dir=(-1, 0, 0))) as chamfer5_piece_16a_section:
        Polygon((CHAMFER5_SIZE * 0.999621916911, CHAMFER5_SIZE * 0.0274958766106), (-CHAMFER5_SIZE * 0.0274958766106, CHAMFER5_SIZE * 0.999621916911), (0, 0), align=None)
    chamfer5_piece_16a = extrude(amount=8.857854903, mode=Mode.PRIVATE)
    chamfer5_piece_16a = split(chamfer5_piece_16a, bisect_by=Plane(origin=(-3.75, 16.670206373, 16.141850932), z_dir=(1, 0, 0)), keep=Keep.TOP, mode=Mode.PRIVATE)
    with BuildSketch(Plane(origin=(-3.75, 17, 12.740374317), x_dir=(-0.02749587661058651, -0.9996219169112968, 0), z_dir=(0, 0, 1))) as chamfer5_piece_16b_section:
        Polygon((CHAMFER5_SIZE * 0.999621916911, CHAMFER5_SIZE * 0.0274958766106), (-CHAMFER5_SIZE * 0.0274958766106, CHAMFER5_SIZE * 0.999621916911), (0, 0), align=None)
    chamfer5_piece_16b = extrude(amount=5.643365976, mode=Mode.PRIVATE)
    chamfer5_piece_16b = split(chamfer5_piece_16b, bisect_by=Plane(origin=(-3.420206373, 16.670206373, 15.812057305), z_dir=(0, 0, 1)), keep=Keep.TOP, mode=Mode.PRIVATE)
    chamfer5_piece_16 = chamfer5_piece_16a & chamfer5_piece_16b
    add(chamfer5_piece_16, mode=Mode.SUBTRACT)
    with BuildSketch(Plane(origin=(-9.318189504, 17, -11.354573768), x_dir=(0.013780926423704508, -0.9996219169112968, -0.02379305145392368), z_dir=(-0.8653316201150884, 0, -0.501199747834131))) as chamfer5_piece_17a_section:
        Polygon((CHAMFER5_SIZE * 0.999621916911, CHAMFER5_SIZE * 0.0274958766106), (-CHAMFER5_SIZE * 0.0274958766106, CHAMFER5_SIZE * 0.999621916911), (0, 0), align=None)
    chamfer5_piece_17a = extrude(amount=6.443365976, mode=Mode.PRIVATE)
    chamfer5_piece_17a = split(chamfer5_piece_17a, bisect_by=Plane(origin=(-12.833771699, 16.670206373, -13.009679452), z_dir=(-0.8653316201150884, 0, -0.501199747834131)), keep=Keep.TOP, mode=Mode.PRIVATE)
    with BuildSketch(Plane(origin=(-13.957406081, 17, -11.069701699), x_dir=(0.02379305145392368, -0.9996219169112968, 0.013780926423704508), z_dir=(0.501199747834131, 0, -0.8653316201150884))) as chamfer5_piece_17b_section:
        Polygon((CHAMFER5_SIZE * 0.999621916911, CHAMFER5_SIZE * 0.0274958766106), (-CHAMFER5_SIZE * 0.0274958766106, CHAMFER5_SIZE * 0.999621916911), (0, 0), align=None)
    chamfer5_piece_17b = extrude(amount=4.371682988, mode=Mode.PRIVATE)
    chamfer5_piece_17b = split(chamfer5_piece_17b, bisect_by=Plane(origin=(-12.953860069, 16.670206373, -13.460352788), z_dir=(-0.501199747834131, 0, 0.8653316201150884)), keep=Keep.TOP, mode=Mode.PRIVATE)
    chamfer5_piece_17 = chamfer5_piece_17a & chamfer5_piece_17b
    add(chamfer5_piece_17, mode=Mode.SUBTRACT)
    with BuildSketch(Plane(origin=(-12.668479216, 17, -13.295060305), x_dir=(0.02379305145392368, -0.9996219169112968, 0.013780926423704508), z_dir=(0.501199747834131, 0, -0.8653316201150884))) as chamfer5_piece_18a_section:
        Polygon((CHAMFER5_SIZE * 0.999621916911, CHAMFER5_SIZE * 0.0274958766106), (-CHAMFER5_SIZE * 0.0274958766106, CHAMFER5_SIZE * 0.999621916911), (0, 0), align=None)
    chamfer5_piece_18a = extrude(amount=4.371682988, mode=Mode.PRIVATE)
    chamfer5_piece_18a = split(chamfer5_piece_18a, bisect_by=Plane(origin=(-12.051700523, 16.670206373, -15.017949704), z_dir=(0.5011997478341315, 0, -0.8653316201150881)), keep=Keep.TOP, mode=Mode.PRIVATE)
    with BuildSketch(Plane(origin=(-13.991678276, 17, -16.141584087), x_dir=(-0.01378092642370314, -0.9996219169112968, 0.02379305145392129), z_dir=(0.8653316201150881, 0, 0.5011997478341315))) as chamfer5_piece_18b_section:
        Polygon((CHAMFER5_SIZE * 0.999621916911, CHAMFER5_SIZE * 0.0274958766106), (-CHAMFER5_SIZE * 0.0274958766106, CHAMFER5_SIZE * 0.999621916911), (0, 0), align=None)
    chamfer5_piece_18b = extrude(amount=6.443365976, mode=Mode.PRIVATE)
    chamfer5_piece_18b = split(chamfer5_piece_18b, bisect_by=Plane(origin=(-11.601027187, 16.670206373, -15.138038075), z_dir=(-0.8653316201150884, 0, -0.501199747834131)), keep=Keep.TOP, mode=Mode.PRIVATE)
    chamfer5_piece_18 = chamfer5_piece_18a & chamfer5_piece_18b
    add(chamfer5_piece_18, mode=Mode.SUBTRACT)

    # Chamfer6
    chamfer6_edges = [part.edges().sort_by_distance(p)[0] for p in [
        (3.75, 8, 15.312057305),
        (-3.75, 8, 15.312057305),
    ]]
    chamfer(chamfer6_edges, length=CHAMFER6_SIZE - 0.0001)  # a hair under: the kernel refuses the full size


solid = part.part
